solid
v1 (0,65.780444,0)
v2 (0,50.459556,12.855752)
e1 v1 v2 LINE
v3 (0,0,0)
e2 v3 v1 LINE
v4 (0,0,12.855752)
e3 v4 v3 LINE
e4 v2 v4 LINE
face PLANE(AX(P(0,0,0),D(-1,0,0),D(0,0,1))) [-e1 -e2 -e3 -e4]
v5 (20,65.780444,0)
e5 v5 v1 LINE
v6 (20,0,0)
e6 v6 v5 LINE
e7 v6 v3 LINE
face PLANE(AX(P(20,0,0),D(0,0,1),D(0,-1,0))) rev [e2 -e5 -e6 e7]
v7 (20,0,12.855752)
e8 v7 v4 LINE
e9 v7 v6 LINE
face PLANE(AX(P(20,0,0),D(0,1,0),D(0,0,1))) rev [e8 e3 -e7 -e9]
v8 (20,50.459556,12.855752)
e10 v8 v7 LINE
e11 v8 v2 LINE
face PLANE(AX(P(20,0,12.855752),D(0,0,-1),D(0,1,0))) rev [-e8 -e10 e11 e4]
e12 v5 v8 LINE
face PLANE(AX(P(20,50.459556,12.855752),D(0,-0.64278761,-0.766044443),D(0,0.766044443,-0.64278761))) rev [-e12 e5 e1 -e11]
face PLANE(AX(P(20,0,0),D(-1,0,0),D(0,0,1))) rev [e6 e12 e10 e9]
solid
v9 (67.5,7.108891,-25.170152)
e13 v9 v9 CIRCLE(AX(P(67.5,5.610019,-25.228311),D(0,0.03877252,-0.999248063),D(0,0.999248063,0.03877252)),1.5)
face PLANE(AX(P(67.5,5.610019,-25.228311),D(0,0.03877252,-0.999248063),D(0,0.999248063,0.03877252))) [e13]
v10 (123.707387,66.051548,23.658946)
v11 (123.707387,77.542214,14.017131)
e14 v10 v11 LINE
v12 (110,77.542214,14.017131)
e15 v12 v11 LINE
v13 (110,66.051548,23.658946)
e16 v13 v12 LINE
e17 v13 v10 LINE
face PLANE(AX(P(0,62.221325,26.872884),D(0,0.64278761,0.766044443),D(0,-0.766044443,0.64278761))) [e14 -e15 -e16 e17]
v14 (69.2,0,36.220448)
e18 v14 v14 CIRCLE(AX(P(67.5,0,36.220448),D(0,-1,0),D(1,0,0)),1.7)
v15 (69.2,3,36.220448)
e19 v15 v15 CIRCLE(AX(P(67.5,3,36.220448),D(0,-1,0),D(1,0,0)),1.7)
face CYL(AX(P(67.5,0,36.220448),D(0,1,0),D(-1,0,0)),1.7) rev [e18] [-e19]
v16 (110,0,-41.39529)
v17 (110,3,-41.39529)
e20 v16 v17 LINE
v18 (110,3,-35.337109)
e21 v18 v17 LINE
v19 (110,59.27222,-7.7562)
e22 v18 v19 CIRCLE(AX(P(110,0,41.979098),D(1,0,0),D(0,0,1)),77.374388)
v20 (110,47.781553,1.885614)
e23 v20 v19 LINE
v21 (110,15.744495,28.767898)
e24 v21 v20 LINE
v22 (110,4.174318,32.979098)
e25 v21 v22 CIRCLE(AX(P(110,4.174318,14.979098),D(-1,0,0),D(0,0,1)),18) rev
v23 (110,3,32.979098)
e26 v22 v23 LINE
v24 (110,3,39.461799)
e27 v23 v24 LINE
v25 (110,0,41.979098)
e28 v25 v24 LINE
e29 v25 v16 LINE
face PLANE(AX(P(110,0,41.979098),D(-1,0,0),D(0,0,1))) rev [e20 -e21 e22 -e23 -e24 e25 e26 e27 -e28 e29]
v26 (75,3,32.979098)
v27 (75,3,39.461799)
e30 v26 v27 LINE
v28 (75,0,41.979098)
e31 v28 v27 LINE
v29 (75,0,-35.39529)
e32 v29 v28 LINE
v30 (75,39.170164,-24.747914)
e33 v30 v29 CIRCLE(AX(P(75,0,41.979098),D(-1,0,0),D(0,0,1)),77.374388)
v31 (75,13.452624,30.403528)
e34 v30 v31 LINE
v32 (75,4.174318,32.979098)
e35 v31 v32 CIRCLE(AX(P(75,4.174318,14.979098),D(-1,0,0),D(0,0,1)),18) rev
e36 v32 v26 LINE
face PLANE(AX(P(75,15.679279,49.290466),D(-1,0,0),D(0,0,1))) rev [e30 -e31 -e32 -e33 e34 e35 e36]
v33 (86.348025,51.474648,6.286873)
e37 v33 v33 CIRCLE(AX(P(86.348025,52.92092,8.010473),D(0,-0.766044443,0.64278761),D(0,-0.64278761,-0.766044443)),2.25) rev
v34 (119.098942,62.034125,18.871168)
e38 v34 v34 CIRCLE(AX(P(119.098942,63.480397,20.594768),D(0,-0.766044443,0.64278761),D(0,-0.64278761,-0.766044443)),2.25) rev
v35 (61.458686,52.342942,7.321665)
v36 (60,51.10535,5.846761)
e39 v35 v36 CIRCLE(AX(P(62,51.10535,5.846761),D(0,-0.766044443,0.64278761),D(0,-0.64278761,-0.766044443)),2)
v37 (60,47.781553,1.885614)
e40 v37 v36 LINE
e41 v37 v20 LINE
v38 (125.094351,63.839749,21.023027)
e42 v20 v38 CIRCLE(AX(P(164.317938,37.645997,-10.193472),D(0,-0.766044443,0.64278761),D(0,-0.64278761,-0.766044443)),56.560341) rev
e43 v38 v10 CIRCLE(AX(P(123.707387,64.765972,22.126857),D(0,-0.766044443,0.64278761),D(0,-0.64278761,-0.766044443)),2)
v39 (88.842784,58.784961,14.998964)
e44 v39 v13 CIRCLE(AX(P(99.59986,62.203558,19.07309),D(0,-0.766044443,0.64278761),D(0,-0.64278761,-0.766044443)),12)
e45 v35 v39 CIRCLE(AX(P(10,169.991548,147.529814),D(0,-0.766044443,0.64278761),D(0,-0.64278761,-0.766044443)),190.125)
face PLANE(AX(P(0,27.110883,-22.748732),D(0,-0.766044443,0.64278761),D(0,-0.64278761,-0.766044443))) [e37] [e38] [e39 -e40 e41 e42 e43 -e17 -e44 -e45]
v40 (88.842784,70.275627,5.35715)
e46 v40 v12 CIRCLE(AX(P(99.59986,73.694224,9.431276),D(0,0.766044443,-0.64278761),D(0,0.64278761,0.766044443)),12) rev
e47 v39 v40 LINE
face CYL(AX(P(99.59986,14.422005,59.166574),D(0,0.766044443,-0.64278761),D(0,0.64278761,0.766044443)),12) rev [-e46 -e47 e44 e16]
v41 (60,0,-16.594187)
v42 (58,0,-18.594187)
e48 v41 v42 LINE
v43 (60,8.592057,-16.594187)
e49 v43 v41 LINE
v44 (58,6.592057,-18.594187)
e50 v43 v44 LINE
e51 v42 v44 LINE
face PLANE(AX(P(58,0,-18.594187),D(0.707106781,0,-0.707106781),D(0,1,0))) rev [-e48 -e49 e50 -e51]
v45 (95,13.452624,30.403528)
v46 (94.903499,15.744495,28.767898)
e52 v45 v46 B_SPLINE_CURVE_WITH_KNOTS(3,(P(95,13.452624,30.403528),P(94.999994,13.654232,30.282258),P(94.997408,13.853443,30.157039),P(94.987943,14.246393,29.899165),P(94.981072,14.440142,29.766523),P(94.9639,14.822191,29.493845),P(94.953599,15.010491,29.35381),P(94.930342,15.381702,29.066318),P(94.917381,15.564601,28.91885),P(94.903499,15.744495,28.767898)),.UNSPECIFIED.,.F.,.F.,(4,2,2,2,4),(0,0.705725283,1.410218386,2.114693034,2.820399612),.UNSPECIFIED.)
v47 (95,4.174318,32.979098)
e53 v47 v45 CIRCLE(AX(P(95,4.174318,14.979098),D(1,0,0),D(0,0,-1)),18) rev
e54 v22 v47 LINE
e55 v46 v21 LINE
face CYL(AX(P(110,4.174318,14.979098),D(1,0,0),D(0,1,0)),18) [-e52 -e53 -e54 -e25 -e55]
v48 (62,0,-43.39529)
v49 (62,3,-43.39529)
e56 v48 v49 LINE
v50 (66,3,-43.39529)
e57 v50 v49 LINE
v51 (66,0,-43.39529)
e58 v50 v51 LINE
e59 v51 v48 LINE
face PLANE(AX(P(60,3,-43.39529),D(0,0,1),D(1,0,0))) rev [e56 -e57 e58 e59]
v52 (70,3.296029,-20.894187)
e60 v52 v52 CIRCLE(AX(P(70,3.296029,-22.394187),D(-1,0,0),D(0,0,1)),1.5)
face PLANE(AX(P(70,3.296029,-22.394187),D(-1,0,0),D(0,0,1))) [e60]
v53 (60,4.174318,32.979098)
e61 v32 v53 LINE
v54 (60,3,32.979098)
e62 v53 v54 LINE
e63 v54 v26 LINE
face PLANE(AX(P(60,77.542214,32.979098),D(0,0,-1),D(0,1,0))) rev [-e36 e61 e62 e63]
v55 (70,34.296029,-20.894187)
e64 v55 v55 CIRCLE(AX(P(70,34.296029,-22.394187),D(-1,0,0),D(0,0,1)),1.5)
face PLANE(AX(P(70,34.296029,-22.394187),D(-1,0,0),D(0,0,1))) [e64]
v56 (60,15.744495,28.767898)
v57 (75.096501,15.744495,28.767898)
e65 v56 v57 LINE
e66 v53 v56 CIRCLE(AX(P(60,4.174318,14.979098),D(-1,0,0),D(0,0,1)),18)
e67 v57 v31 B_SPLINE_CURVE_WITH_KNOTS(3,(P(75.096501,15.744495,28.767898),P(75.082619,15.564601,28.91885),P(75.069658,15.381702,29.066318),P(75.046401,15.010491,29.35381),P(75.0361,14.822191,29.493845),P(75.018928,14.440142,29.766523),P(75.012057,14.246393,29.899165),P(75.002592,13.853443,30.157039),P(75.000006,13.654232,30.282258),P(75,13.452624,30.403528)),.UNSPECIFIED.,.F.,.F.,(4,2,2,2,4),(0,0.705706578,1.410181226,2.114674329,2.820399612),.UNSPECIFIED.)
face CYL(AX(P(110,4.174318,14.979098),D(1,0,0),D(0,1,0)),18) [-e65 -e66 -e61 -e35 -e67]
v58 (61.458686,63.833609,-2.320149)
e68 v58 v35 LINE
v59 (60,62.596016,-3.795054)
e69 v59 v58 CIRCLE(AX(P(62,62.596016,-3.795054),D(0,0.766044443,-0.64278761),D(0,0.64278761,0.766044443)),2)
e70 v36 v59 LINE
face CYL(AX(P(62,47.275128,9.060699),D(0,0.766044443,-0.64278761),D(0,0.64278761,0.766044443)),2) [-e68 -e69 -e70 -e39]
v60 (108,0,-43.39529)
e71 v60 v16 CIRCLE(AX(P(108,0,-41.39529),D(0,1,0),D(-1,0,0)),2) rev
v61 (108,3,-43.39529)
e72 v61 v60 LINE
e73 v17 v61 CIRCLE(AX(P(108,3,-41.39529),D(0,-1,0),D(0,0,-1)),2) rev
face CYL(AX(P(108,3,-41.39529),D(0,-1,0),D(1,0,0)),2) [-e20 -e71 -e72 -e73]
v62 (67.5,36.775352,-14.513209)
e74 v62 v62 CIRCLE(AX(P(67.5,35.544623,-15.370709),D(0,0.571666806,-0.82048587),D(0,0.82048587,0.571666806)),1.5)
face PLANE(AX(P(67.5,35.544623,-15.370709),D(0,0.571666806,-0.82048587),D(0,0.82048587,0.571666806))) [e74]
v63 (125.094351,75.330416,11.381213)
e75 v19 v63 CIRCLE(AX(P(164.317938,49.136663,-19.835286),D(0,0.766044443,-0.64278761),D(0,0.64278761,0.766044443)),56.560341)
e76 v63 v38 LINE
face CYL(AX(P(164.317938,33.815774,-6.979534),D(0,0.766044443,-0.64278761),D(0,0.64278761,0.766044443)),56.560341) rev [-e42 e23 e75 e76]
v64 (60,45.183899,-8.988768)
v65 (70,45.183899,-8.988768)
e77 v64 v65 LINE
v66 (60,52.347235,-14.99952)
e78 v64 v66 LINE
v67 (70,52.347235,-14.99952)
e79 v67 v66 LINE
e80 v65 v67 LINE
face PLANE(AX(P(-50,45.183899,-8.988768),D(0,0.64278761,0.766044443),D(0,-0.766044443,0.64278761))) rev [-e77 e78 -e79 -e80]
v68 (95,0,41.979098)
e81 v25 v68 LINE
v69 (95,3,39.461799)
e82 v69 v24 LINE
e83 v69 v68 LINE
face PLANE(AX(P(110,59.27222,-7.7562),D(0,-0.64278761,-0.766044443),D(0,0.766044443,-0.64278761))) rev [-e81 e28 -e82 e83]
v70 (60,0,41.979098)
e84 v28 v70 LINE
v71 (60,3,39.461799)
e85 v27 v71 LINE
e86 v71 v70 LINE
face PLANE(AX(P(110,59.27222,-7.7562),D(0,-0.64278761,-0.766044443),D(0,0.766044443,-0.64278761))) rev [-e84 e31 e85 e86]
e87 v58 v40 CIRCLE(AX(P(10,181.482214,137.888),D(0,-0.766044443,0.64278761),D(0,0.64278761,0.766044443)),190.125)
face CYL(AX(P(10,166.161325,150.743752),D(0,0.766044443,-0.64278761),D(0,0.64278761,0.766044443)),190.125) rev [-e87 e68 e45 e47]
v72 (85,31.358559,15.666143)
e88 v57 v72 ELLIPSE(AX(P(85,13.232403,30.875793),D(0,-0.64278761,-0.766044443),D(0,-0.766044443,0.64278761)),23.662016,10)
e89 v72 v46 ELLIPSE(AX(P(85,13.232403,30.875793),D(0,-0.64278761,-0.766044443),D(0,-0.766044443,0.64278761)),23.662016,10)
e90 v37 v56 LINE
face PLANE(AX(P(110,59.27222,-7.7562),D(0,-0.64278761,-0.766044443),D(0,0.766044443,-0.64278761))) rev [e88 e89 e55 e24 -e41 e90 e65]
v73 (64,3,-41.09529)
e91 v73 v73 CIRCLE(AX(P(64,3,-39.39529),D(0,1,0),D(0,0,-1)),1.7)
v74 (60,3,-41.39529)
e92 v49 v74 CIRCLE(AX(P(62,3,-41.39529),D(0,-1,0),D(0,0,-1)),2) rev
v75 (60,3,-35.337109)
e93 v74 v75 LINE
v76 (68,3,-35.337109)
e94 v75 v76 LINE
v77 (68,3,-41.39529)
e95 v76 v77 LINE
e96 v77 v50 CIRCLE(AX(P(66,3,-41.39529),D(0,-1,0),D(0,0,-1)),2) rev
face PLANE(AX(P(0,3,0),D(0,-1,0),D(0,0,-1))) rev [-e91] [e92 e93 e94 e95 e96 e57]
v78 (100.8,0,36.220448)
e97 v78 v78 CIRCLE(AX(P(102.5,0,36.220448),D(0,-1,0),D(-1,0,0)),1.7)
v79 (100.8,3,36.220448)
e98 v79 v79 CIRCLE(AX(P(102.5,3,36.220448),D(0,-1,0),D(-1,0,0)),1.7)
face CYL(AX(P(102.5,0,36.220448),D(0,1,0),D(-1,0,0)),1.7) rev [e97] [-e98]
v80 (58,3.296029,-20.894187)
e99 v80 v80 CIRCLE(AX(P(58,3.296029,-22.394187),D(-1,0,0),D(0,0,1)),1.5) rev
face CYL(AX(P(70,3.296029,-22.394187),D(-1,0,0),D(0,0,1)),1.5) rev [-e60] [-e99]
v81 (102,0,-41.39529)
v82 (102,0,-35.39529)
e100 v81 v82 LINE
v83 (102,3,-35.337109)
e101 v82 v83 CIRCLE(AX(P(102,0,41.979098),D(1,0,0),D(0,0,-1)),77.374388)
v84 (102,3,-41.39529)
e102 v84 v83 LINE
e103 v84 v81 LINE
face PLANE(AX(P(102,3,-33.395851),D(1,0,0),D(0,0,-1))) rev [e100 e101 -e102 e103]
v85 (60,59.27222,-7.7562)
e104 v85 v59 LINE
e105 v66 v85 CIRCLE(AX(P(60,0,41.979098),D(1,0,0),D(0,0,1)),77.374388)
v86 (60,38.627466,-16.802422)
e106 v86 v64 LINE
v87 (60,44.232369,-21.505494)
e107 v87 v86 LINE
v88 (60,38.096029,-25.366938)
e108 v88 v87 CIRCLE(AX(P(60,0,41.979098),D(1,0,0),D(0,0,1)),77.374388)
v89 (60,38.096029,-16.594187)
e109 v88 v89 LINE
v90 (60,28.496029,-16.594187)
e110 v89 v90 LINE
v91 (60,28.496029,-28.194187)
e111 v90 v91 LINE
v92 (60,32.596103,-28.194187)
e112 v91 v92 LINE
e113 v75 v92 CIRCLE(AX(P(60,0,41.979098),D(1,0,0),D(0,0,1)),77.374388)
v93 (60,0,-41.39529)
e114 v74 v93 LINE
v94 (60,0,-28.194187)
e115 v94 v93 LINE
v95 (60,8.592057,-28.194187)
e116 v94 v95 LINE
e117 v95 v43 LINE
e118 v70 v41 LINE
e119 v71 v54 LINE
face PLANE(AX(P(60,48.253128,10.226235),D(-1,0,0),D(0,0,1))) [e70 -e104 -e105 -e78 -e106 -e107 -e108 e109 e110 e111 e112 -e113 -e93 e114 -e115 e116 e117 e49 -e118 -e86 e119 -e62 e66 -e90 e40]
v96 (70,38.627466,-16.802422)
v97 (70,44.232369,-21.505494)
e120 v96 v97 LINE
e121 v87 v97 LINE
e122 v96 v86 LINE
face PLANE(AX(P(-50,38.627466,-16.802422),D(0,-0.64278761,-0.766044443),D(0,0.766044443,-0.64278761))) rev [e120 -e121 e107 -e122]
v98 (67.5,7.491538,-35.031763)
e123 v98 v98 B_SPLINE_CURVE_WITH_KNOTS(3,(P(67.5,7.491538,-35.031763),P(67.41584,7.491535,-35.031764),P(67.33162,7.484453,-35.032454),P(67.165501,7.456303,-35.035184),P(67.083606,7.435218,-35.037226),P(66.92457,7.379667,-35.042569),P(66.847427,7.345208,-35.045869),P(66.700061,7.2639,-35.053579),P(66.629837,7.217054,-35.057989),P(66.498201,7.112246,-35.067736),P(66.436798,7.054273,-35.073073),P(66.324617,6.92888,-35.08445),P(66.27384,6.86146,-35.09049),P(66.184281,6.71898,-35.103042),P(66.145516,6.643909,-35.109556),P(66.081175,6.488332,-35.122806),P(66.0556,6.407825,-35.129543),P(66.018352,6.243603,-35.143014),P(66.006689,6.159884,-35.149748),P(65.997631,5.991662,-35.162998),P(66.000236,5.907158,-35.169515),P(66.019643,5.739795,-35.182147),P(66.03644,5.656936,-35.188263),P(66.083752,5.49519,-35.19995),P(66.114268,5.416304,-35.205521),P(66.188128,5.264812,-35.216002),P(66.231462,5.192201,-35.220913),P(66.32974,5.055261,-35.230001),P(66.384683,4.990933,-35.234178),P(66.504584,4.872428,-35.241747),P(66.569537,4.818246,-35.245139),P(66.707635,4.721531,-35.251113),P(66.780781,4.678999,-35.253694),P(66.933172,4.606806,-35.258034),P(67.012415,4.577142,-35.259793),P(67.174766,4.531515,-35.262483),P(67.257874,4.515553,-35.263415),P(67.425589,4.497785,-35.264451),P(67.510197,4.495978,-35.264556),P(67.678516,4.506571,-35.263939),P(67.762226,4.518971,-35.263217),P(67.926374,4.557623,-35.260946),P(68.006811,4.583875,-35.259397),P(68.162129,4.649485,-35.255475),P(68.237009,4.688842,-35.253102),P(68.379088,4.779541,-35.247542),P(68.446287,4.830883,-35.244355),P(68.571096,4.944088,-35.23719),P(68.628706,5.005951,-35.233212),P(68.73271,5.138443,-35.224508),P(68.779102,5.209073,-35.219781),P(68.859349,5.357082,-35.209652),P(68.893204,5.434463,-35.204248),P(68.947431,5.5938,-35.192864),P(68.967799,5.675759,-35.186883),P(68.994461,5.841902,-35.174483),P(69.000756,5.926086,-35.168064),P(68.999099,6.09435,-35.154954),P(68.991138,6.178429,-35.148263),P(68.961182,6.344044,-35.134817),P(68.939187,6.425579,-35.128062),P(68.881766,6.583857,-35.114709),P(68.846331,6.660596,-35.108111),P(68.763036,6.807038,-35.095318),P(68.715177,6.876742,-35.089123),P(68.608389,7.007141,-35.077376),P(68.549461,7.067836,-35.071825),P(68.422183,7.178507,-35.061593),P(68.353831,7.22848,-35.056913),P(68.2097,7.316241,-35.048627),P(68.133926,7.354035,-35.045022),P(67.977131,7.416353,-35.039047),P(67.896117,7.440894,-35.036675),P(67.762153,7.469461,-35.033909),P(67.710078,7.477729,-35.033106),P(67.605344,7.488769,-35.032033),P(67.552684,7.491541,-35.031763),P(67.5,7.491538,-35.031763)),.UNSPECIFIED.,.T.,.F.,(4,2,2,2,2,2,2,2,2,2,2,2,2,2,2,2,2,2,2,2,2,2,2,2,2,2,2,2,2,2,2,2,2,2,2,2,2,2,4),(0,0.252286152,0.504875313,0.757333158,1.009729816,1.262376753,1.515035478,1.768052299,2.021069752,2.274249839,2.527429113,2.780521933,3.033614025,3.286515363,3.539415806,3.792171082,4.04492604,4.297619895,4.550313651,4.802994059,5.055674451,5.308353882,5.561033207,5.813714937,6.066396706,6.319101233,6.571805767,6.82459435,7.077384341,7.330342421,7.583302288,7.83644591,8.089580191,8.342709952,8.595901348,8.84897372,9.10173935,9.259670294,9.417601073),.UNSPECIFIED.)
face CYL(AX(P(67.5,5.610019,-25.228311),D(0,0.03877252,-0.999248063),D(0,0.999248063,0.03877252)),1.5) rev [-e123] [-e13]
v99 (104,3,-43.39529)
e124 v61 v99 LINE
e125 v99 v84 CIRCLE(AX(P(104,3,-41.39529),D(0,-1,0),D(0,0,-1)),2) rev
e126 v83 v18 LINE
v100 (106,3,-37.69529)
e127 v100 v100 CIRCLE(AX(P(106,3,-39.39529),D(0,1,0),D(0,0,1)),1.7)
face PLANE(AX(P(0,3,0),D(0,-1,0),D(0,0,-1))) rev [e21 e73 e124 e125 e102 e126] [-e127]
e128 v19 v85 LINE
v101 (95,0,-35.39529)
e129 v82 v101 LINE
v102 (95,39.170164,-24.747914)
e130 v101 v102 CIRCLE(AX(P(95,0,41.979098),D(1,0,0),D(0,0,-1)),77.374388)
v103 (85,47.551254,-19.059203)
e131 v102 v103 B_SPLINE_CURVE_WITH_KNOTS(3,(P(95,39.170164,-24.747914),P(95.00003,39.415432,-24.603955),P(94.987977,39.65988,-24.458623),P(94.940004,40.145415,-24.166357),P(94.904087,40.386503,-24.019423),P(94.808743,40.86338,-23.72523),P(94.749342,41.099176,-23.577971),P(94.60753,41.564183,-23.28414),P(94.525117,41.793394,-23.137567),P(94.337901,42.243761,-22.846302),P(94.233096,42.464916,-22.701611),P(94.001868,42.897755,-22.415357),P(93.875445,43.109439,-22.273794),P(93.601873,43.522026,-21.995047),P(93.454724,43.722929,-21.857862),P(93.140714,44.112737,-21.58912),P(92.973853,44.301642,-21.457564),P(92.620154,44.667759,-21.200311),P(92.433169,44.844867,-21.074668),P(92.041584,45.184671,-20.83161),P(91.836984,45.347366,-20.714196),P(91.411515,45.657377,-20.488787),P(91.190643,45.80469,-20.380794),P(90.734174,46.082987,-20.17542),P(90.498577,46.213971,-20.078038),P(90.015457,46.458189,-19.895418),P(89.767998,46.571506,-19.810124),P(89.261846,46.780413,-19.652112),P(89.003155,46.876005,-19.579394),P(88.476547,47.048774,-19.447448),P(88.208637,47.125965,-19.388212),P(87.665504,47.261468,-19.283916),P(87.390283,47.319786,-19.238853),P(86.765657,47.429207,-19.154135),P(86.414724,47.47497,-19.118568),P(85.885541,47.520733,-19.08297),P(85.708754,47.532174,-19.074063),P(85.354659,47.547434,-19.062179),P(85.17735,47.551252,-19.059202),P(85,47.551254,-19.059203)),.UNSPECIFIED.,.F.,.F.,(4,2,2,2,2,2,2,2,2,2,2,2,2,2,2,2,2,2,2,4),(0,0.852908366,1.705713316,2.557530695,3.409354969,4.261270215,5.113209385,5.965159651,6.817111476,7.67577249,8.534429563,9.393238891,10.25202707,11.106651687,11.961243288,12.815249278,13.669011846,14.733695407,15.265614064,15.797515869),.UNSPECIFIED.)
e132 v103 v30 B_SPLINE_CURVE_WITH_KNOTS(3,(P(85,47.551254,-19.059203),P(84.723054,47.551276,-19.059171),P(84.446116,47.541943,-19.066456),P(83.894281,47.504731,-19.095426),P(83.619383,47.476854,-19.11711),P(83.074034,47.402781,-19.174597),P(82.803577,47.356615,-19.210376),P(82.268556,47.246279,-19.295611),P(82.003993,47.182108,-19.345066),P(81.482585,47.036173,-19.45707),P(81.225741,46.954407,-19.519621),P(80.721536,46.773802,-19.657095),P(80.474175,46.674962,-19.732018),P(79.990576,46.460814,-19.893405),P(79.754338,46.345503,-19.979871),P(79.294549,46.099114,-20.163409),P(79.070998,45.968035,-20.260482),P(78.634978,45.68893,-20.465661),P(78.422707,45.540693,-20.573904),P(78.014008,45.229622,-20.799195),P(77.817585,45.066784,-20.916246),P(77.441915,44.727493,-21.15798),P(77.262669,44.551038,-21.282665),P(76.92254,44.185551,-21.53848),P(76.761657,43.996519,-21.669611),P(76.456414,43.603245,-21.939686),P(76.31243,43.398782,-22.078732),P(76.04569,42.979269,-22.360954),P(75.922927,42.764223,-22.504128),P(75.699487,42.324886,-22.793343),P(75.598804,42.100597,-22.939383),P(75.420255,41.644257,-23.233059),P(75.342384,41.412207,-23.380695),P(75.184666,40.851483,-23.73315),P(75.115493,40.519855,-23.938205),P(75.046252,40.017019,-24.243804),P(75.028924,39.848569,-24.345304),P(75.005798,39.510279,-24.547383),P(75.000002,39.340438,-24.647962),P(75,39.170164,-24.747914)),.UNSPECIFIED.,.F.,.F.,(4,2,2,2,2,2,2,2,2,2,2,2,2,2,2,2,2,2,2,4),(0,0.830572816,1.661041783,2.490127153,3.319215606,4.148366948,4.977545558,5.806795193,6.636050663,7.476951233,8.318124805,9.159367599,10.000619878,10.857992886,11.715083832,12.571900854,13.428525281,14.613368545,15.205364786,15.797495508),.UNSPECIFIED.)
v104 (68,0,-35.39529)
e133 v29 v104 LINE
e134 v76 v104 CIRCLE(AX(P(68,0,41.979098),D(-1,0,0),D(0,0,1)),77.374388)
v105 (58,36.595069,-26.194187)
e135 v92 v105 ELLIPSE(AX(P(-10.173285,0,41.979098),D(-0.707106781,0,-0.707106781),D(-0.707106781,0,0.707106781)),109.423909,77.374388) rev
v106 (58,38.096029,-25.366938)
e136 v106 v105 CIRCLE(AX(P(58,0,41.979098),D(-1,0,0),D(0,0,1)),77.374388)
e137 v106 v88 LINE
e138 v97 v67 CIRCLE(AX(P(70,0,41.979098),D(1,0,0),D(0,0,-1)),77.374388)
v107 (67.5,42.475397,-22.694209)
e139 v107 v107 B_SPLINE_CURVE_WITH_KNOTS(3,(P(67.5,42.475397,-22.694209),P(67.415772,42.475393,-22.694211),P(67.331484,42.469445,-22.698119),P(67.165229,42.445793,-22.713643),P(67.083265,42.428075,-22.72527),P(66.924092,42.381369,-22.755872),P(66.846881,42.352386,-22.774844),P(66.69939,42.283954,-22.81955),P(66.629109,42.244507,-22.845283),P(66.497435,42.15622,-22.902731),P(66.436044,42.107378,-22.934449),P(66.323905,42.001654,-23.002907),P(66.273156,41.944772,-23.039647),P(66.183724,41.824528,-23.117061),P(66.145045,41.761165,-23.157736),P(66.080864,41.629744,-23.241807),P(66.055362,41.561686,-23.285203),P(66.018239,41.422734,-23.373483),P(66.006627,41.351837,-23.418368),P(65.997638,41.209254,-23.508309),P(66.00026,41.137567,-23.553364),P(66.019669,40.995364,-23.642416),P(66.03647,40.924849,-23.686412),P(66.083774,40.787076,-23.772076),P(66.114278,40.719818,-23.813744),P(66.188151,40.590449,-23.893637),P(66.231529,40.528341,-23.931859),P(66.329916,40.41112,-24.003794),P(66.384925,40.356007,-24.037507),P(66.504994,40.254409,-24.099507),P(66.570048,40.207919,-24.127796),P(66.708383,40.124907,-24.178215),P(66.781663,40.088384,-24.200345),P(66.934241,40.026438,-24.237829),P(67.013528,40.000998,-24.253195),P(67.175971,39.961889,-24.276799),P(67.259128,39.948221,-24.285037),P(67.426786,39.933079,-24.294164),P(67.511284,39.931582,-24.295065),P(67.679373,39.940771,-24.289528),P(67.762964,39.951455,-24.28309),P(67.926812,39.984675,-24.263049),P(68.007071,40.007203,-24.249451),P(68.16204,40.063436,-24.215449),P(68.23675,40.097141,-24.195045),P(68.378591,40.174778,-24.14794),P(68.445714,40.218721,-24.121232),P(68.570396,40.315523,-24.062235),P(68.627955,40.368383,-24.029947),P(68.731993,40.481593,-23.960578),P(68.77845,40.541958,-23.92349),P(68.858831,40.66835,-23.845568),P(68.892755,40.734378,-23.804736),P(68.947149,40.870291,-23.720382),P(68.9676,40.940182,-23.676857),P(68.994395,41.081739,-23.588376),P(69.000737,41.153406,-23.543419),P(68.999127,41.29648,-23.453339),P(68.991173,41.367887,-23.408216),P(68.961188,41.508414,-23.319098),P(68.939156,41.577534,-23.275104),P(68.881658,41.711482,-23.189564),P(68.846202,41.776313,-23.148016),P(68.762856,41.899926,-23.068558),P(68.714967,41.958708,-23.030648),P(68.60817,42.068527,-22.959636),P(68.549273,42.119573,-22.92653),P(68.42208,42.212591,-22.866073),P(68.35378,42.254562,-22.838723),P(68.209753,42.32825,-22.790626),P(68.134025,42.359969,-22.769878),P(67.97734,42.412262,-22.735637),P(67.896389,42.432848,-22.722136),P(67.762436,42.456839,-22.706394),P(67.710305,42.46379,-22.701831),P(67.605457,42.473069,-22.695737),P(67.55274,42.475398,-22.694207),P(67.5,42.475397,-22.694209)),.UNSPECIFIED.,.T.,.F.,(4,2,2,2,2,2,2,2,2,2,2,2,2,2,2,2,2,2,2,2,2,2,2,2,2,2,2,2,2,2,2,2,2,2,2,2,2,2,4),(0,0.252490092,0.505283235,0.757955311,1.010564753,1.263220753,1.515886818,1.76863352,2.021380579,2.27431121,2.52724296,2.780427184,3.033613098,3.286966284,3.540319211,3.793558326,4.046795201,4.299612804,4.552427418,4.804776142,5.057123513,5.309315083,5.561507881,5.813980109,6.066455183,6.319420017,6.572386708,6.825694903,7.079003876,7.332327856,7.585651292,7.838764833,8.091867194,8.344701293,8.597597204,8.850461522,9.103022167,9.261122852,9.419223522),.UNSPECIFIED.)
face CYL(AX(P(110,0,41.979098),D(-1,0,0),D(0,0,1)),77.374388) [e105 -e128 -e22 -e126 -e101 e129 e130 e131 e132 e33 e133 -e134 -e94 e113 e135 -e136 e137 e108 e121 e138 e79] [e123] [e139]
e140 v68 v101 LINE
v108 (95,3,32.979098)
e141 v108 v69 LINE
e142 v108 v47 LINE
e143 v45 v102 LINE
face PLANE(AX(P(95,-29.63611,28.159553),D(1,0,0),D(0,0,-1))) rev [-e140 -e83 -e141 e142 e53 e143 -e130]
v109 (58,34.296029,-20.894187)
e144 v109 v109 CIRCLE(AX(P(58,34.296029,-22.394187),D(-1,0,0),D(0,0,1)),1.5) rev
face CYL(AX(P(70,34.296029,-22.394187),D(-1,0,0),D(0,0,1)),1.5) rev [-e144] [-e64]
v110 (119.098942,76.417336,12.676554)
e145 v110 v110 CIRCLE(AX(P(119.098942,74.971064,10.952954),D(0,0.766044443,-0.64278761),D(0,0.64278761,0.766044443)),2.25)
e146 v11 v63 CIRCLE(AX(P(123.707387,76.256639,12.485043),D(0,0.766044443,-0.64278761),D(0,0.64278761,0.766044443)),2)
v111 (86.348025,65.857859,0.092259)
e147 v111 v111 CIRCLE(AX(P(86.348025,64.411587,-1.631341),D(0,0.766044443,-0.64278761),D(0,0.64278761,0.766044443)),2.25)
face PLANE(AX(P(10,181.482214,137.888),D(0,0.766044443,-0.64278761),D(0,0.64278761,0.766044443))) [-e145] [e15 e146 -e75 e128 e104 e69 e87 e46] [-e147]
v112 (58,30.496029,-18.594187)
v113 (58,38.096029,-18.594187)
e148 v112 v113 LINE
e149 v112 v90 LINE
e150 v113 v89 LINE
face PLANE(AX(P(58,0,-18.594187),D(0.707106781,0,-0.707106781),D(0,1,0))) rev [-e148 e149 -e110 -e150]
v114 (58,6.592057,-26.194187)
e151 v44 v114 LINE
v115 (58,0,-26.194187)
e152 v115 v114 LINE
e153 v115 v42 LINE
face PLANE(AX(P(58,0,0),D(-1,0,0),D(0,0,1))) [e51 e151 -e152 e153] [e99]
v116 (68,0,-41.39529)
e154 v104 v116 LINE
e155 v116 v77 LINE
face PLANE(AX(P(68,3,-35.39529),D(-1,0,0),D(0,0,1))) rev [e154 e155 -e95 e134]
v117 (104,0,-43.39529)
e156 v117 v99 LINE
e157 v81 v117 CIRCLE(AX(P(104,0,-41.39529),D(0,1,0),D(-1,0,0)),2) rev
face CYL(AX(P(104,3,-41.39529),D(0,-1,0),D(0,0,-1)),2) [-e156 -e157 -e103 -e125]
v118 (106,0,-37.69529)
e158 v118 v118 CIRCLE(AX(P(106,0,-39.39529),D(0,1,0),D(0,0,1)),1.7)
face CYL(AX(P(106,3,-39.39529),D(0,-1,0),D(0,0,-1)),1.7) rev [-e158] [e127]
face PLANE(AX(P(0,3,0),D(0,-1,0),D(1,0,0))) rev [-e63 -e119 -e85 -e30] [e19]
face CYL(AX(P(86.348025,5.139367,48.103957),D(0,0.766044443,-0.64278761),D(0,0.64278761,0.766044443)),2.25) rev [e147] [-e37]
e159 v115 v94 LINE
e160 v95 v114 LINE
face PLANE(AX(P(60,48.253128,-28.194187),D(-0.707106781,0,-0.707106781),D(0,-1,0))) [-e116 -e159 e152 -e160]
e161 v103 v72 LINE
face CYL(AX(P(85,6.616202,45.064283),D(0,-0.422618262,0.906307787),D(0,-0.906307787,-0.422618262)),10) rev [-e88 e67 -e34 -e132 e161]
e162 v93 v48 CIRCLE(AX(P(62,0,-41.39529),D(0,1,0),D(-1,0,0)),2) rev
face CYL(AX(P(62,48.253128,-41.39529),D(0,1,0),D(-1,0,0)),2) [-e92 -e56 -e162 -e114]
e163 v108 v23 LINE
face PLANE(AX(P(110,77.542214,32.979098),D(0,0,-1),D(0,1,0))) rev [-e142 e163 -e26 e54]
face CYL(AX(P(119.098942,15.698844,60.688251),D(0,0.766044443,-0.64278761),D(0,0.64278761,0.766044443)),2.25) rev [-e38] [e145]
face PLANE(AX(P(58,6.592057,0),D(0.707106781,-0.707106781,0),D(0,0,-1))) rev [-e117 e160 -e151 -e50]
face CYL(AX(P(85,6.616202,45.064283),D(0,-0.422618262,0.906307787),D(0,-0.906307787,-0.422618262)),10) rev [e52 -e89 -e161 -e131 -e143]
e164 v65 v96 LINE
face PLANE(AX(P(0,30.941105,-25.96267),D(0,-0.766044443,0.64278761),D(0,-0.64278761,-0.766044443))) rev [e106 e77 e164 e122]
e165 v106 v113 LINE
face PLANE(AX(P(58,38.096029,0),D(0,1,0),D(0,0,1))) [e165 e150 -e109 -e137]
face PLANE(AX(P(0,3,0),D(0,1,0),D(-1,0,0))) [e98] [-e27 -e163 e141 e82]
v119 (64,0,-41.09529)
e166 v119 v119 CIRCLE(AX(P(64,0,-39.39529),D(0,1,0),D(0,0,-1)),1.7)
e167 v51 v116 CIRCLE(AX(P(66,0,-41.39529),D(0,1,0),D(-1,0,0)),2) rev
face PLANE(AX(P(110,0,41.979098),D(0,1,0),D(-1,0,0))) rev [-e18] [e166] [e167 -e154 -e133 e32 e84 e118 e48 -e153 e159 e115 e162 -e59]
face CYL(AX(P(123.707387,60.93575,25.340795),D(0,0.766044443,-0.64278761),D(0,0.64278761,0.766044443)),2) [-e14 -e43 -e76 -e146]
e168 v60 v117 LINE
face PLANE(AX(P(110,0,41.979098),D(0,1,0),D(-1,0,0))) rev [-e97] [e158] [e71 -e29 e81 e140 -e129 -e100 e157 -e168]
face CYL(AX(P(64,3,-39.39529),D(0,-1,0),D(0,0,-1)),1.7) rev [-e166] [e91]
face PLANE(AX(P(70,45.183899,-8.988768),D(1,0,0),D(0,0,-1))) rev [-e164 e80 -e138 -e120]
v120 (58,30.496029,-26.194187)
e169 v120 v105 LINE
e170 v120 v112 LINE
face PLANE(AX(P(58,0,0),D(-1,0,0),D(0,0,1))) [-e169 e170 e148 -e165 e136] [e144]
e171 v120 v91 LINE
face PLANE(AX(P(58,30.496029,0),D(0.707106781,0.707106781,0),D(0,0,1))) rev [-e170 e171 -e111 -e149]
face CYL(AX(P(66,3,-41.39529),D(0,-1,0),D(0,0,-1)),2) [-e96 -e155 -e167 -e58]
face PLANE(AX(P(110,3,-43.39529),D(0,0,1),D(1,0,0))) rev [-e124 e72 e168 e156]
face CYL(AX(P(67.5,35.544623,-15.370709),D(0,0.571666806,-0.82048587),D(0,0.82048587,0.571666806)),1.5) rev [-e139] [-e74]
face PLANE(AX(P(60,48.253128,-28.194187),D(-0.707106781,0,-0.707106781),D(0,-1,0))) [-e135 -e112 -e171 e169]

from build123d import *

# Parameters (mm, degrees)
AUFSATZ_LINEAR_AUSTRAGEN1_DEPTH   = 20
AUFSATZ_LINEAR_AUSTRAGEN2_DEPTH   = 20
AUFSATZ_LINEAR_AUSTRAGEN2_2_DEPTH = 20
AUFSATZ_LINEAR_AUSTRAGEN3_DEPTH   = 50
AUFSATZ_LINEAR_AUSTRAGEN4_DEPTH   = 20
SKIZZE5_R                         = 2.2499999999999347
SKIZZE5_R_2                       = 2.2499999999999964
SCHNITT_LINEAR_AUSTRAGEN1_DEPTH   = 154.92337827661623
AUFSATZ_LINEAR_AUSTRAGEN5_DEPTH   = 50
VERRUNDUNG3_R                     = 2
SKIZZE10_R                        = 2.2499999999999964
SCHNITT_LINEAR_AUSTRAGEN2_DEPTH   = 154.9233782766163
SCHNITT_LINEAR_AUSTRAGEN3_DEPTH   = 5
SKIZZE12_W                        = 19.999999999999993
SKIZZE12_H                        = 50
SKIZZE12_W_2                      = 20.000000000000014
SCHNITT_LINEAR_AUSTRAGEN4_DEPTH   = 163.42500642504442
VERRUNDUNG5_R                     = 10
VERRUNDUNG6_R                     = 10
SKIZZE13_R                        = 1.6999999999999995
SKIZZE13_R_2                      = 1.700000000000026
AUFSATZ_LINEAR_AUSTRAGEN9_DEPTH   = 3
VERRUNDUNG7_R                     = 2
VERRUNDUNG8_R                     = 2
SCHNITT_LINEAR_AUSTRAGEN5_DEPTH   = 156.1930410648953
VERRUNDUNG9_R                     = 18
SKIZZE15_R                        = 1.6999999999999995
SCHNITT_LINEAR_AUSTRAGEN6_DEPTH   = 156.1930410648953
VERRUNDUNG10_R                    = 2
SKIZZE18_W                        = 119.99999999999997
SKIZZE18_H                        = 10.2
SCHNITT_LINEAR_AUSTRAGEN8_DEPTH   = 10
VERRUNDUNG12_R                    = 18
VERRUNDUNG13_R                    = 2
SKIZZE16_R                        = 102.01235542308495
SCHNITT_LINEAR_AUSTRAGEN7_DEPTH   = 189.02894525437085
SKIZZE19_R                        = 1.5000000000000009
SKIZZE19_R_2                      = 1.5000000000000007
SCHNITT_LINEAR_AUSTRAGEN9_DEPTH   = 10
SKIZZE20_R                        = 2.4999999999999987
SKIZZE20_R_2                      = 1.5000000000000007
SKIZZE20_R_3                      = 1.5000000000000009
AUFSATZ_LINEAR_AUSTRAGEN11_DEPTH  = 2
FASE1_SIZE                        = 2
SKIZZE21_R                        = 1.4999999999999973
SCHNITT_LINEAR_AUSTRAGEN12_DEPTH  = 10
SKIZZE22_R                        = 1.4999999999999971
SCHNITT_LINEAR_AUSTRAGEN13_DEPTH  = 10


with BuildPart() as part:
    # Skizze1 → Aufsatz-Linear austragen1 (new body)
    with BuildSketch(Plane(origin=(0, 0, 0), x_dir=(0, 0, -1), z_dir=(1, 0, 0))):
        Polygon((0, 0), (-1.209e-14, 65.78044443118975), (-12.855752193730883, 50.45955556881026), (-12.855752193730876, -2.36e-15), align=None)
    extrude(amount=AUFSATZ_LINEAR_AUSTRAGEN1_DEPTH)


with BuildPart() as body_2:
    # Skizze2 → Aufsatz-Linear austragen2 (new body)
    with BuildSketch(Plane(origin=(0, 38.60154936639293, -32.390545836212254), x_dir=(-1, 0, 0), z_dir=(0, 0.7660444431189743, -0.6427876096865437))):
        with BuildLine():
            Line((89.99999999999999, 60.58092012780532), (90, 32.15785464004299))
            Line((90, 32.15785464004299), (40, 32.157854640043))
            Line((40, 32.157854640043), (39.99999999999999, 38.85026313842354))
            ThreePointArc((39.99999999999999, 38.85026313842354), (65.782949027453, 47.914106689894396), (89.99999999999999, 60.58092012780532))
        make_face()
    extrude(amount=-AUFSATZ_LINEAR_AUSTRAGEN2_DEPTH)

    # Skizze4 → Aufsatz-Linear austragen3 (add)
    with BuildSketch(Plane.ZY.offset(90.00000000000001)):
        with BuildLine():
            ThreePointArc((-7.756199986579628, 59.27221988311346), (-28.14591240579339, 32.699829313458416), (-35.39529003392221, -6.94e-15))
            Line((-35.39529003392221, -6.94e-15), (41.979097856400095, -6.94e-15))
            Line((41.979097856400095, -6.94e-15), (5.099552207151247, 43.951331020733974))
            Line((5.099552207151247, 43.951331020733974), (-7.756199986579628, 59.27221988311346))
        make_face()
    extrude(amount=-AUFSATZ_LINEAR_AUSTRAGEN3_DEPTH)



with BuildPart() as body_3:
    # Skizze2 → Aufsatz-Linear austragen2 2 (new body)
    with BuildSketch(Plane(origin=(0, 38.60154936639293, -32.390545836212254), x_dir=(-1, 0, 0), z_dir=(0, 0.7660444431189743, -0.6427876096865437))):
        with BuildLine():
            Line((-109.99999999999997, 60.58092012780532), (-109.99999999999999, 32.15785464004299))
            Line((-109.99999999999999, 32.15785464004299), (-60.00000000000001, 32.157854640043))
            Line((-60.00000000000001, 32.157854640043), (-60, 38.85026313842354))
            ThreePointArc((-60, 38.85026313842354), (-85.78294902745297, 47.91410668989437), (-109.99999999999997, 60.58092012780532))
        make_face()
    extrude(amount=-AUFSATZ_LINEAR_AUSTRAGEN2_2_DEPTH)


with BuildPart() as body_2_1:
    add(body_2.part)

    add(body_3.part)  # Aufsatz-Linear austragen4 merges body 3
    # Skizze6 → Aufsatz-Linear austragen4 (add)
    with BuildSketch(Plane(origin=(0, 38.601549366392966, -32.39054583621228), x_dir=(1, 0, 0), z_dir=(0, 0.7660444431189745, -0.6427876096865438))):
        with BuildLine():
            ThreePointArc((-90, -32.15785464004299), (-97.30849227277704, -47.841026986521875), (-109.01622804444871, -60.58092012780532))
            Line((-109.01622804444871, -60.58092012780532), (-89.99999999999996, -60.58092012780531))
            Line((-89.99999999999996, -60.58092012780531), (-90, -32.15785464004299))
        make_face()
        with BuildLine():
            ThreePointArc((110.00000000000001, -32.157854640043034), (117.30849227277703, -47.84102698652191), (129.01622804444872, -60.580920127805356))
            Line((129.01622804444872, -60.580920127805356), (110, -60.580920127805335))
            Line((110, -60.580920127805335), (110.00000000000001, -32.157854640043034))
        make_face()
    extrude(amount=-AUFSATZ_LINEAR_AUSTRAGEN4_DEPTH)

    # Skizze5 → Schnitt-Linear austragen1 (cut, through all)
    with BuildSketch(Plane(origin=(0, 38.601549366392966, -32.39054583621228), x_dir=(1, 0, 0), z_dir=(0, 0.7660444431189745, -0.6427876096865438))):
        with Locations(Location((-67.93678140390588, -39.2901785012674, 0), (0, 0, 270))):
            Circle(SKIZZE5_R)
        with BuildLine():
            ThreePointArc((-68.8427839392676, -49.276117644901774), (-85.25507840084563, -44.01063116187818), (-90, -60.58092012780534))
            ThreePointArc((-89.99999999999999, -60.58092012780534), (-79.59986038817945, -54.59451084889355), (-68.84278393926756, -49.2761176449018))
        make_face()
        with Locations(Location((-98.80470560431883, -55.787792133473864, 0), (0, 0, 270))):
            Circle(SKIZZE5_R_2)
        with BuildLine():
            ThreePointArc((110.00000000000003, -60.580920127805335), (93.94464237551333, -65.17839053590887), (88.84278393926762, -49.27611764490177))
            ThreePointArc((88.84278393926762, -49.27611764490177), (105.25507840084566, -44.01063116187818), (110.00000000000003, -60.580920127805335))
        make_face()
    extrude(amount=-SCHNITT_LINEAR_AUSTRAGEN1_DEPTH, mode=Mode.SUBTRACT)

    # Skizze7 → Aufsatz-Linear austragen5 (add)
    with BuildSketch(Plane(origin=(60.00000000000004, 3.999e-14, 4.766e-14), x_dir=(7.9e-16, 0, -1), z_dir=(1, 6.7e-16, 7.9e-16))):
        with BuildLine():
            Line((7.756199986579595, 59.272219883113486), (-41.979097856400124, 1.817e-14))
            Line((-41.979097856400124, 1.817e-14), (35.39529003392218, 1.817e-14))
            ThreePointArc((35.39529003392218, 1.817e-14), (28.145912405793332, 32.69982931345845), (7.756199986579595, 59.272219883113486))
        make_face()
    extrude(amount=AUFSATZ_LINEAR_AUSTRAGEN5_DEPTH)

    # Verrundung3
    verrundung3_edges = [body_2_1.edges().sort_by_distance(p)[0] for p in [
        (-109.01622804444871, 69.88176977676663, 20.445007483592853),
    ]]
    fillet(verrundung3_edges, radius=VERRUNDUNG3_R)

    # Skizze10 → Schnitt-Linear austragen2 (cut, through all)
    with BuildSketch(Plane(origin=(0, 38.601549366392966, -32.39054583621228), x_dir=(1, 0, 0), z_dir=(0, 0.7660444431189745, -0.6427876096865438))):
        with Locations(Location((86.34802459849006, -40.15329039482156, 0), (0, 0, 270))):
            Circle(SKIZZE10_R)
        with Locations(Location((119.09894185825529, -56.58092012780534, 0), (0, 0, 270))):
            Circle(SKIZZE10_R)
    extrude(amount=-SCHNITT_LINEAR_AUSTRAGEN2_DEPTH, mode=Mode.SUBTRACT)

    # Skizze11 → Schnitt-Linear austragen3 (cut)
    with BuildSketch(Plane(origin=(0, 23.28066050401348, -19.534793642481407), x_dir=(1, 0, 0), z_dir=(0, -0.7660444431189745, 0.6427876096865438))):
        Polygon((60.00000000000001, 32.15785464004304), (109.99999999999999, 32.1578546400431), (141.02821228777057, 65.90002397102104), (38.34357710817464, 62.992820090396236), align=None)
    extrude(amount=-SCHNITT_LINEAR_AUSTRAGEN3_DEPTH, mode=Mode.SUBTRACT)

    # Skizze12 → Schnitt-Linear austragen4 (cut, through all)
    with BuildSketch(Plane(origin=(-8.12e-15, 16.620901993437233, -35.64363935003694), x_dir=(-1, 3.1e-16, 3.7e-16), z_dir=(0, 0.4226182617407026, -0.9063077870366486))):
        with Locations((65, 10.041304052055779)):
            Rectangle(SKIZZE12_W, SKIZZE12_H)
        with Locations((-85.00000000000011, 10.041304052055779)):
            Rectangle(SKIZZE12_W_2, SKIZZE12_H)
    extrude(amount=-SCHNITT_LINEAR_AUSTRAGEN4_DEPTH, mode=Mode.SUBTRACT)

    # Verrundung5
    verrundung5_edges = [body_2_1.edges().sort_by_distance(p)[0] for p in [
        (75.0000000000001, 39.4549061743576, -1.6965302152626833),
        (95.0000000000001, 39.45490617435759, -1.696530215262662),
    ]]
    fillet(verrundung5_edges, radius=VERRUNDUNG5_R - 0.0001)  # a hair under: the kernel refuses the full size

    # Verrundung6
    verrundung6_edges = [body_2_1.edges().sort_by_distance(p)[0] for p in [
        (-54.999999999999986, 39.45490617435774, -1.6965302152628254),
        (-75, 39.454906174357745, -1.6965302152628183),
    ]]
    fillet(verrundung6_edges, radius=VERRUNDUNG6_R - 0.0001)  # a hair under: the kernel refuses the full size

    # Skizze13 → Aufsatz-Linear austragen9 (add)
    # profile 1 of 4: a face of its own
    with BuildSketch(Plane(origin=(0, 0, 0), x_dir=(1, 0, 0), z_dir=(0, 1, 0))):
        Polygon((-40.00000000000001, 35.395290033922194), (-40, 43.39529003392219), (-48, 43.39529003392219), (-48, 35.395290033922194), (-48, 33.39585128291134), (-40.00000000000001, 33.39585128291134), align=None)
        with Locations(Location((-44, 39.395290033922194, 0), (0, 0, 270))):
            Circle(SKIZZE13_R, mode=Mode.SUBTRACT)
    # profile 2 of 4: a face of its own
    with BuildSketch(Plane(origin=(0, 0, 0), x_dir=(1, 0, 0), z_dir=(0, 1, 0))):
        Polygon((-90.00000000000003, 43.39529003392219), (-82.00000000000003, 43.39529003392219), (-82.00000000000003, 35.395290033922194), (-82.00000000000003, 33.39585128291134), (-90.00000000000003, 33.39585128291134), (-90.00000000000003, 35.395290033922194), align=None)
        with Locations(Location((-86.00000000000003, 39.395290033922194, 0), (0, 0, 90))):
            Circle(SKIZZE13_R, mode=Mode.SUBTRACT)
    # profile 3 of 4: a face of its own
    with BuildSketch(Plane(origin=(0, 0, 0), x_dir=(1, 0, 0), z_dir=(0, 1, 0))):
        Polygon((68.00000000000006, 33.39585128291134), (68.00000000000006, 35.395290033922194), (68.00000000000006, 43.39529003392219), (60.00000000000006, 43.39529003392219), (60.000000000000064, 35.39529003392213), (60.000000000000064, 33.39585128291134), align=None)
        with Locations(Location((64.00000000000006, 39.395290033922194, 0), (0, 0, 90))):
            Circle(SKIZZE13_R, mode=Mode.SUBTRACT)
    # profile 4 of 4: a face of its own
    with BuildSketch(Plane(origin=(0, 0, 0), x_dir=(1, 0, 0), z_dir=(0, 1, 0))):
        Polygon((110.0000000000001, 33.39585128291134), (102.00000000000007, 33.39585128291134), (102.00000000000007, 35.395290033922194), (102.00000000000007, 43.39529003392219), (110.0000000000001, 43.39529003392219), (110.0000000000001, 35.395290033922194), align=None)
        with Locations(Location((106.00000000000009, 39.395290033922194, 0), (0, 0, 270))):
            Circle(SKIZZE13_R_2, mode=Mode.SUBTRACT)
    extrude(amount=AUFSATZ_LINEAR_AUSTRAGEN9_DEPTH)

    # Verrundung7
    verrundung7_edges = [body_2_1.edges().sort_by_distance(p)[0] for p in [
        (-40, 1.5, -43.39529003392219),
        (-48, 1.5, -43.39529003392219),
        (-90.00000000000003, 1.5, -43.39529003392219),
        (-82.00000000000003, 1.5, -43.39529003392219),
    ]]
    fillet(verrundung7_edges, radius=VERRUNDUNG7_R)

    # Verrundung8
    verrundung8_edges = [body_2_1.edges().sort_by_distance(p)[0] for p in [
        (60.00000000000006, 1.5, -43.39529003392219),
        (68.00000000000006, 1.5, -43.39529003392219),
        (102.00000000000007, 1.5, -43.39529003392219),
        (110.0000000000001, 1.5, -43.39529003392219),
    ]]
    fillet(verrundung8_edges, radius=VERRUNDUNG8_R)

    # Skizze14 → Schnitt-Linear austragen5 (cut, through all)
    with BuildSketch(Plane(origin=(9.4e-16, 2.9999999999999933, 0), x_dir=(-1, 3.1e-16, 0), z_dir=(-3.1e-16, -1, 0))):
        Polygon((90.00000000000001, -32.97909785640016), (74.99999999999999, -32.97909785640016), (74.99999999999999, -41.9790978564003), (89.99999999999999, -41.97909785640014), align=None)
        Polygon((39.99999999999998, -41.97909785640012), (39.999999999999936, -32.97909785640016), (54.999999999999964, -32.97909785640016), (54.999999999999986, -41.9790978564003), align=None)
        Polygon((-59.99999999999996, -32.97909785640016), (-74.99999999999999, -32.97909785640016), (-75.00000000000001, -41.9790978564003), (-60.00000000000001, -41.97909785640017), align=None)
        Polygon((-110, -41.97909785640014), (-110.00000000000003, -32.97909785640016), (-95, -32.97909785640016), (-95, -41.9790978564003), align=None)
    extrude(amount=-SCHNITT_LINEAR_AUSTRAGEN5_DEPTH, mode=Mode.SUBTRACT)

    # Verrundung9
    verrundung9_edges = [body_2_1.edges().sort_by_distance(p)[0] for p in [
        (-47.49999999999998, 10.725782333347722, 32.97909785640016),
        (-82.49999999999999, 10.72578233334775, 32.97909785640016),
    ]]
    fillet(verrundung9_edges, radius=VERRUNDUNG9_R)

    # Skizze15 → Schnitt-Linear austragen6 (cut, through all)
    with BuildSketch(Plane(origin=(9.4e-16, 2.9999999999999933, 0), x_dir=(-1, 3.1e-16, 0), z_dir=(-3.1e-16, -1, 0))):
        with Locations(Location((82.49999999999999, -36.22044840963421, 0), (0, 0, 180))):
            Circle(SKIZZE15_R)
        with Locations((47.499999999999986, -36.22044840963421)):
            Circle(SKIZZE15_R)
        with Locations((-102.50000000000001, -36.22044840963421)):
            Circle(SKIZZE15_R)
        with Locations(Location((-67.5, -36.22044840963421, 0), (0, 0, 180))):
            Circle(SKIZZE15_R)
    extrude(amount=SCHNITT_LINEAR_AUSTRAGEN6_DEPTH, mode=Mode.SUBTRACT)

    # Verrundung10
    verrundung10_edges = [body_2_1.edges().sort_by_distance(p)[0] for p in [
        (129.01622804444872, 71.79688088456409, 18.838038459376516),
        (60.00000000000001, 57.828683821441146, 2.1913894273360848),
    ]]
    fillet(verrundung10_edges, radius=VERRUNDUNG10_R)

    # Skizze18 → Schnitt-Linear austragen8 (cut)
    with BuildSketch(Plane(origin=(0, 38.601549366392945, -32.39054583621226), x_dir=(1, 0, 0), z_dir=(0, 0.7660444431189745, -0.6427876096865438))):
        with Locations((10.000000000000039, -17.05785464004297)):
            Rectangle(SKIZZE18_W, SKIZZE18_H)
    extrude(amount=-SCHNITT_LINEAR_AUSTRAGEN8_DEPTH, mode=Mode.SUBTRACT)

    # Verrundung12
    verrundung12_edges = [body_2_1.edges().sort_by_distance(p)[0] for p in [
        (102.5, 10.725782333347924, 32.97909785640016),
        (67.5, 10.725782333347862, 32.97909785640016),
    ]]
    fillet(verrundung12_edges, radius=VERRUNDUNG12_R)

    # Verrundung13
    verrundung13_edges = [body_2_1.edges().sort_by_distance(p)[0] for p in [
        (-39.999999999999986, 55.91357271364369, 3.7983584515524607),
    ]]
    fillet(verrundung13_edges, radius=VERRUNDUNG13_R)

    # Skizze16 → Schnitt-Linear austragen7 (cut, through all)
    with BuildSketch(Plane(origin=(-40.000000000000036, 2.666e-14, 3.177e-14), x_dir=(-7.9e-16, 0, -1), z_dir=(1, -6.7e-16, -7.9e-16))):
        with Locations((7.488259970443778, 22.25050331384182)):
            Circle(SKIZZE16_R)
    extrude(amount=-SCHNITT_LINEAR_AUSTRAGEN7_DEPTH, mode=Mode.SUBTRACT)

    # Skizze19 → Schnitt-Linear austragen9 (cut)
    with BuildSketch(Plane.ZY.offset(-60.00000000000004)):
        with Locations((-22.394187380356886, 34.29602854135633)):
            Circle(SKIZZE19_R)
        with Locations((-22.394187380356886, 3.296028541356328)):
            Circle(SKIZZE19_R_2)
    extrude(amount=-SCHNITT_LINEAR_AUSTRAGEN9_DEPTH, mode=Mode.SUBTRACT)

    # Skizze20 → Aufsatz-Linear austragen11 (add)
    # profile 1 of 3: a face of its own
    with BuildSketch(Plane.ZY.offset(-60.00000000000004)):
        Polygon((-24.894187380356882, 1.819e-14), (-19.894187380356886, 1.819e-14), (-18.594187380356885, 1.833e-14), (-18.594187380356885, 6.592057082712639), (-19.894187380356886, 6.592057082712637), (-24.894187380356882, 6.592057082712637), (-26.194187380356883, 6.592057082712638), (-26.194187380356883, 1.74e-14), align=None)
        with Locations((-22.394187380356886, 3.2960285413563275)):
            Circle(SKIZZE20_R, mode=Mode.SUBTRACT)
    # profile 2 of 3: a face of its own
    with BuildSketch(Plane.ZY.offset(-60.00000000000004)):
        with Locations((-22.394187380356886, 3.2960285413563275)):
            Circle(SKIZZE20_R)
        with Locations((-22.394187380356886, 3.296028541356328)):
            Circle(SKIZZE20_R_2, mode=Mode.SUBTRACT)
    # profile 3 of 3: a face of its own
    with BuildSketch(Plane.ZY.offset(-60.00000000000004)):
        with BuildLine():
            Line((-26.194187380356883, 36.595069086283004), (-26.194187380356883, 30.496028541356324))
            Line((-26.194187380356883, 30.496028541356324), (-18.594187380356882, 30.496028541356324))
            Line((-18.594187380356882, 30.496028541356324), (-18.594187380356882, 38.09602854135633))
            Line((-18.594187380356882, 38.09602854135633), (-25.36693774168257, 38.096028541356326))
            ThreePointArc((-25.36693774168257, 38.09602854135633), (-25.78471844481995, 37.34783931764406), (-26.194187380356887, 36.595069086283004))
        make_face()
        with Locations((-22.394187380356886, 34.29602854135633)):
            Circle(SKIZZE20_R_3, mode=Mode.SUBTRACT)
    extrude(amount=AUFSATZ_LINEAR_AUSTRAGEN11_DEPTH)

    # Fase1
    fase1_edges = [body_2_1.edges().sort_by_distance(p)[0] for p in [
        (60.00000000000006, 3.2960285413563684, -18.59418738035684),
        (60.000000000000064, 3.296028541356368, -26.194187380356837),
        (60.00000000000006, 6.592057082712678, -22.39418738035684),
        (60.000000000000036, 34.29602854135637, -18.594187380356836),
        (60.00000000000004, 33.54554881381971, -26.194187380356837),
        (60.00000000000004, 30.496028541356363, -22.394187380356836),
    ]]
    chamfer(fase1_edges, length=FASE1_SIZE - 0.0001)  # a hair under: the kernel refuses the full size

    # Skizze21 → Schnitt-Linear austragen12 (cut)
    with BuildSketch(Plane(origin=(1.162e-14, 24.542302710435624, -35.22438658297153), x_dir=(-1, 1.5e-16, -2.2e-16), z_dir=(0, 0.5716668063955725, -0.820485869753701))):
        with Locations(Location((-67.50000000000006, 20.376936816014638, 0), (0, 0, 90))):
            Circle(SKIZZE21_R)
    extrude(amount=-SCHNITT_LINEAR_AUSTRAGEN12_DEPTH, mode=Mode.SUBTRACT)

    # Skizze22 → Schnitt-Linear austragen13 (cut)
    with BuildSketch(Plane(origin=(2.72e-14, 1.3735884689018287, -35.40021690632274), x_dir=(-1, 3e-17, -7.7e-16), z_dir=(0, 0.03877251997459974, -0.9992480631428913))):
        with Locations(Location((-67.50000000000006, 4.627635410153003, 0), (0, 0, 90))):
            Circle(SKIZZE22_R)
    extrude(amount=-SCHNITT_LINEAR_AUSTRAGEN13_DEPTH, mode=Mode.SUBTRACT)


solid = Compound([part.part, body_2_1.part])
